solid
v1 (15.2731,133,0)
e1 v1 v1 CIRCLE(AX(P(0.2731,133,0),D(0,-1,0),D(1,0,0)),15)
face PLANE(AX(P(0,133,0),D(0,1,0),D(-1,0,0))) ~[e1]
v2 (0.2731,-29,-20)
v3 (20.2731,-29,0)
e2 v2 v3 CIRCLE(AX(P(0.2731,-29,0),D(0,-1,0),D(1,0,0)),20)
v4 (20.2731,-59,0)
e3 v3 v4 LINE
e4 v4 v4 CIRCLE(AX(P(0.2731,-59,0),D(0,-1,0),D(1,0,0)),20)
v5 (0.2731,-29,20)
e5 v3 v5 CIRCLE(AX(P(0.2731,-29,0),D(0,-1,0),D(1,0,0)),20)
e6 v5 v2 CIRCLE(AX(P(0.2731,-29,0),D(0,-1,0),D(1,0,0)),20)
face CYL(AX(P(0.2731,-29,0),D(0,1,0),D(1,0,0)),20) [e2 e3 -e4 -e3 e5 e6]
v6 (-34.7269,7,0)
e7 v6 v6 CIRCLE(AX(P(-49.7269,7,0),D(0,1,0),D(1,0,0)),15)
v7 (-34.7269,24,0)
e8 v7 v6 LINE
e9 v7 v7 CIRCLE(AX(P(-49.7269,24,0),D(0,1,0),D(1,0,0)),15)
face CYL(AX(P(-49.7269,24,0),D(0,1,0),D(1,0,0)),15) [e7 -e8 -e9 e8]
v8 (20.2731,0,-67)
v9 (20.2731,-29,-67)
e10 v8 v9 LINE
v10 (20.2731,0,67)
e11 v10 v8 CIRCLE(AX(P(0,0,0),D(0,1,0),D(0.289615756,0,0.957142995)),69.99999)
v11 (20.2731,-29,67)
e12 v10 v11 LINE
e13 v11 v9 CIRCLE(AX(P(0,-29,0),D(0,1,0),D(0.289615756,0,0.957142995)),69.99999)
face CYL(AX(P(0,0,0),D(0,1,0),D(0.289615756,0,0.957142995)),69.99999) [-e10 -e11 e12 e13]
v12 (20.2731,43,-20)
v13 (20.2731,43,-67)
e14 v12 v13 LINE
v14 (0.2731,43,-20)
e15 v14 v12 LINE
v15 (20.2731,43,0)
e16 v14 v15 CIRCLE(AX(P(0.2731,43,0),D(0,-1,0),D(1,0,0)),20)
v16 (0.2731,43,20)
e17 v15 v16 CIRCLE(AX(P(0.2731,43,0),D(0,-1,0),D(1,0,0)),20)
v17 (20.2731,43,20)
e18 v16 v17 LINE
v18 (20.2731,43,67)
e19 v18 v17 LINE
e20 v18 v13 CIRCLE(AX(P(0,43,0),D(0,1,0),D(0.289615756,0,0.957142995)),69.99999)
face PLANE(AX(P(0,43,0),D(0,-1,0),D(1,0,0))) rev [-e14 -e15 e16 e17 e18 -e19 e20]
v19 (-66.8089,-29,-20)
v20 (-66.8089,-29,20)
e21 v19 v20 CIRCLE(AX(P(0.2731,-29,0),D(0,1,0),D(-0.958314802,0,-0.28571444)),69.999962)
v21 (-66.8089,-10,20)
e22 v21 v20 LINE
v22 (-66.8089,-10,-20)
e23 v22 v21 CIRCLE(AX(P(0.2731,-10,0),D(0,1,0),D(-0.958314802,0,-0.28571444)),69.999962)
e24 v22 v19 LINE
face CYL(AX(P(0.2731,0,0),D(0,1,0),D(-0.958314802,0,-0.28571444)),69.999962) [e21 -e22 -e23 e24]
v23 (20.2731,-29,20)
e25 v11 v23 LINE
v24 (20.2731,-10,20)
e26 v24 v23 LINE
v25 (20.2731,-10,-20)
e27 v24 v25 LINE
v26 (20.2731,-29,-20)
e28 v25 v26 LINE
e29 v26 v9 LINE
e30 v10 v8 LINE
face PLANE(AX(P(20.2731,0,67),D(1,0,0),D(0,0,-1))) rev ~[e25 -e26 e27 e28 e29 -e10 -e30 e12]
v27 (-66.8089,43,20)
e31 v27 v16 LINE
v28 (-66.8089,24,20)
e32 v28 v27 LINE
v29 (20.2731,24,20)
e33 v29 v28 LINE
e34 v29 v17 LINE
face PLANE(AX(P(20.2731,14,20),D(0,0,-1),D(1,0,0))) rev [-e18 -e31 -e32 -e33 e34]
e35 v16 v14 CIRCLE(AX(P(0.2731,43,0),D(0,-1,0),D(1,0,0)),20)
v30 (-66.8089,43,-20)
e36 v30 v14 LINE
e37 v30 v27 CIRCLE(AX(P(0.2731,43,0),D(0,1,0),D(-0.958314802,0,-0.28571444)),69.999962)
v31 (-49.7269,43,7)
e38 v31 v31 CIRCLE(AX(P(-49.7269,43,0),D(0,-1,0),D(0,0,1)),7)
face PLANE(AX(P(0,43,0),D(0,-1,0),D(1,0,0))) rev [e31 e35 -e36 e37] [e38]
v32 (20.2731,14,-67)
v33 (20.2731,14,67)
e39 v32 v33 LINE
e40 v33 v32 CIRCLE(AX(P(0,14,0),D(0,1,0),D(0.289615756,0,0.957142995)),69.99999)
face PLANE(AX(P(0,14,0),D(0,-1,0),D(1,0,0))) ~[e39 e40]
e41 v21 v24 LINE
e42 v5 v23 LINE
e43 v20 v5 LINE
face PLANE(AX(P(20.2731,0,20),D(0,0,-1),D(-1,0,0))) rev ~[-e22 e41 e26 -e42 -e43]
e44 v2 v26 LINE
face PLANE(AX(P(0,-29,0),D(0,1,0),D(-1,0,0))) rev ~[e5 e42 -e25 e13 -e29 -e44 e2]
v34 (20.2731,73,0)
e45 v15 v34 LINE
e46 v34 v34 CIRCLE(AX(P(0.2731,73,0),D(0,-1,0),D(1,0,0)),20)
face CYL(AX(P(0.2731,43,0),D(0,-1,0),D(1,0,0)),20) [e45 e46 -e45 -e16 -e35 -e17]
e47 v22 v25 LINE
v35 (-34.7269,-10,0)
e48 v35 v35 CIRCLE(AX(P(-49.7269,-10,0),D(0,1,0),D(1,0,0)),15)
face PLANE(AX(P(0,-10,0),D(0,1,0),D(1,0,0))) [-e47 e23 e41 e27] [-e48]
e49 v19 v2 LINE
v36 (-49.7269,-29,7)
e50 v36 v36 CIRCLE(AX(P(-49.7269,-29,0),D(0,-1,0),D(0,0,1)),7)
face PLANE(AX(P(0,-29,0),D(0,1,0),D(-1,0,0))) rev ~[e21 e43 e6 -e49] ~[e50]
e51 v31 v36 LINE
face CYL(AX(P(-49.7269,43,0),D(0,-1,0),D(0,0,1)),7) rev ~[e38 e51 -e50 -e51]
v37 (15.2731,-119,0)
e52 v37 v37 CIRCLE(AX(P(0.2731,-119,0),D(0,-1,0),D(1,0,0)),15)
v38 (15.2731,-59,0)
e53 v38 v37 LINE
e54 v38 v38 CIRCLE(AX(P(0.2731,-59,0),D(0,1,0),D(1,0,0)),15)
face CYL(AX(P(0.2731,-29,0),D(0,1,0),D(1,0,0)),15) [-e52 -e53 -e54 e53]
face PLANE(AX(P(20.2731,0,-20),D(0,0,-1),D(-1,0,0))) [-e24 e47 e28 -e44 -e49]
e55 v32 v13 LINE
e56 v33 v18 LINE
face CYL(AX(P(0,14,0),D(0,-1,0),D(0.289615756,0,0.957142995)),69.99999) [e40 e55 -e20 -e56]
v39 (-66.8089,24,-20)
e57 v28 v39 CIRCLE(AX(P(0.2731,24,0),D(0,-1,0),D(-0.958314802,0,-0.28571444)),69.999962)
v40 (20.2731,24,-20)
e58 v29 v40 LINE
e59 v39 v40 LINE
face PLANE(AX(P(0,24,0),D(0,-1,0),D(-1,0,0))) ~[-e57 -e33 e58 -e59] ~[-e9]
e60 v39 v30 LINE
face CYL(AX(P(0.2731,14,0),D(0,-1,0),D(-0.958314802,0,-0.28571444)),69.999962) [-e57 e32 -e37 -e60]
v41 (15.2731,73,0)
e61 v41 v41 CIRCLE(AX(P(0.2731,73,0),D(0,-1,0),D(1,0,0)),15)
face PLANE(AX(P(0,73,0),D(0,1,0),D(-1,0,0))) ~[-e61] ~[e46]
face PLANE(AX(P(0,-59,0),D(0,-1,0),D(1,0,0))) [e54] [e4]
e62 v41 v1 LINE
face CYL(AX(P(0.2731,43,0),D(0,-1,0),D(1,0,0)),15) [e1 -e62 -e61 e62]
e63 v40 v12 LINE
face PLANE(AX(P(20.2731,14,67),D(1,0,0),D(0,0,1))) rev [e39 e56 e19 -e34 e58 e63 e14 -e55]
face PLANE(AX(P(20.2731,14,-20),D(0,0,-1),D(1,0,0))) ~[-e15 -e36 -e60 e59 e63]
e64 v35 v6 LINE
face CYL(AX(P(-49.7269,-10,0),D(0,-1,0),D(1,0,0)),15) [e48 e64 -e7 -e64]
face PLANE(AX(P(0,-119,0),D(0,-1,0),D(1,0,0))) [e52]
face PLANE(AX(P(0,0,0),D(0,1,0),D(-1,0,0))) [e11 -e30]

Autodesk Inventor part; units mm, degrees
ref_plane "YZ Plane" through (0, 0, 0) normal (1, 0, 0) x (0, 1, 0)
ref_plane "XZ Plane" through (0, 0, 0) normal (0, 1, 0) x (-1, 0, 0)
sketch "Sketch1" plane through (0, 0, 0) normal (0, 1, 0) x (-1, 0, 0)
  arc A0 (-20.2731, 67) -> (-20.2731, -67) centre (0, 0) ccw
  line L0 (0, 67) -> (0, -67)
  line L1 (0, -67) -> (-20.2731, -67)
  line L2 (-20.2731, 67) -> (-20.2731, -67)
  line L3 (-20.2731, 0) -> (-0.2731, 0)
  circle A1 centre (-0.2731, 0) radius 20
  circle A2 centre (-0.2731, 0) radius 15
  line L4 (-20.2731, 20) -> (69.7269, 20)
  arc A3 (66.8089, -20) -> (66.8089, 20) centre (-0.2731, 0) ccw
  line L5 (-20.2731, -20) -> (66.8089, -20)
  dimension "d0" = 140
  dimension "d1" = 134
  dimension "d2" = 20
  dimension "d3" = 30
  dimension "d4" = 90
extrude "Extrusion1" add sketch "Sketch1" against normal blind 29 contours L2 A0 | L4 A1 L2 | L2 A1 L5 | A1 L0 A2 L3 | L3 A2 L0 A1 | A1 L0 A2 | L4 A3 L5 A1 | A2 L0 | A2 L0
sketch "Sketch2" plane through (0, 0, 0) normal (0, 1, 0) x (1, 0, 0)
  line L0 (-66.8089, 20) -> (20.2731, 20) projected
  line L1 (20.2731, -20.1759) -> (20.2731, 20)
  line L2 (20.2731, -20.1759) -> (-74.6075, -20.1759)
  line L3 (-74.6075, -20.1759) -> (-74.6075, 20)
  line L4 (-74.6075, 20) -> (20.2731, 20)
  line L5 (20.2731, 20) -> (20.2731, -20.1759)
  point P0 (0, 0)
extrude "Extrusion2" cut sketch "Sketch2" against normal blind 10
ref_plane "Work Plane1" through (0, 7, 0) normal (0, 1, 0) x (1, 0, 0)
sketch "Sketch3" plane through (0, -29, 0) normal (0, -1, 0) x (1, 0, 0)
  line L0 (20.2731, -67) -> (20.2731, 67) projected
  line L1 (20.2731, 0) -> (0.2731, 0)
  circle A0 centre (0.2731, 0) radius 20
  point P0 (0, 0)
  dimension "d10" = 20
extrude "Extrusion3" add sketch "Sketch3" along normal blind 30
sketch "Sketch4" plane through (0.2731, -59, 0) normal (0, -1, 0) x (1, 0, 0)
  point P0 (-0.2731, 0)
sketch "Sketch5" plane through (0, -29, 0) normal (0, -1, 0) x (1, 0, 0)
  line L0 (20.2731, -67) -> (20.2731, 67) projected
  line L1 (20.2731, 0) -> (0.2731, 0)
  circle A0 centre (0.2731, 0) radius 15
  point P0 (0, 0)
  dimension "d13" = 20
  dimension "d14" = 30
extrude "Extrusion4" add sketch "Sketch5" along normal blind 90
sketch "Sketch6" plane through (0, 0, 0) normal (0, 1, 0) x (1, 0, 0)
  point P0 (0, 0)
sketch "Sketch7" plane through (0, -10, 0) normal (0, 1, 0) x (1, 0, 0)
  line L0 (20.2731, 67) -> (20.2731, -67) projected
  line L1 (20.2731, 0) -> (-49.7269, 0)
  circle A0 centre (-49.7269, 0) radius 15
  point P0 (0, 0)
  dimension "d17" = 70
  dimension "d18" = 30
extrude "Extrusion5" add sketch "Sketch7" along normal blind 17
mirror "Mirror1" about plane through (0, 7, 0) normal (0, 1, 0) of "Extrusion1", "Extrusion5", "Extrusion3", "Extrusion4", "Extrusion2"
hole "Hole1" at (-49.7269, 43, 0) direction (0, -1, 0) diameter 14 end through all
sketch "Sketch8" plane through (0, 7, 0) normal (0, 1, 0) x (1, 0, 0)
  arc A0 (0.2731, -20) -> (0.2731, 20) centre (0.2731, 0) ccw projected
  line L0 (20.2731, 0) -> (0.2731, 0)
  circle A1 centre (0.2731, 0) radius 15
  point P0 (0, 0)
  dimension "d30" = 20
properties part number "crank"
